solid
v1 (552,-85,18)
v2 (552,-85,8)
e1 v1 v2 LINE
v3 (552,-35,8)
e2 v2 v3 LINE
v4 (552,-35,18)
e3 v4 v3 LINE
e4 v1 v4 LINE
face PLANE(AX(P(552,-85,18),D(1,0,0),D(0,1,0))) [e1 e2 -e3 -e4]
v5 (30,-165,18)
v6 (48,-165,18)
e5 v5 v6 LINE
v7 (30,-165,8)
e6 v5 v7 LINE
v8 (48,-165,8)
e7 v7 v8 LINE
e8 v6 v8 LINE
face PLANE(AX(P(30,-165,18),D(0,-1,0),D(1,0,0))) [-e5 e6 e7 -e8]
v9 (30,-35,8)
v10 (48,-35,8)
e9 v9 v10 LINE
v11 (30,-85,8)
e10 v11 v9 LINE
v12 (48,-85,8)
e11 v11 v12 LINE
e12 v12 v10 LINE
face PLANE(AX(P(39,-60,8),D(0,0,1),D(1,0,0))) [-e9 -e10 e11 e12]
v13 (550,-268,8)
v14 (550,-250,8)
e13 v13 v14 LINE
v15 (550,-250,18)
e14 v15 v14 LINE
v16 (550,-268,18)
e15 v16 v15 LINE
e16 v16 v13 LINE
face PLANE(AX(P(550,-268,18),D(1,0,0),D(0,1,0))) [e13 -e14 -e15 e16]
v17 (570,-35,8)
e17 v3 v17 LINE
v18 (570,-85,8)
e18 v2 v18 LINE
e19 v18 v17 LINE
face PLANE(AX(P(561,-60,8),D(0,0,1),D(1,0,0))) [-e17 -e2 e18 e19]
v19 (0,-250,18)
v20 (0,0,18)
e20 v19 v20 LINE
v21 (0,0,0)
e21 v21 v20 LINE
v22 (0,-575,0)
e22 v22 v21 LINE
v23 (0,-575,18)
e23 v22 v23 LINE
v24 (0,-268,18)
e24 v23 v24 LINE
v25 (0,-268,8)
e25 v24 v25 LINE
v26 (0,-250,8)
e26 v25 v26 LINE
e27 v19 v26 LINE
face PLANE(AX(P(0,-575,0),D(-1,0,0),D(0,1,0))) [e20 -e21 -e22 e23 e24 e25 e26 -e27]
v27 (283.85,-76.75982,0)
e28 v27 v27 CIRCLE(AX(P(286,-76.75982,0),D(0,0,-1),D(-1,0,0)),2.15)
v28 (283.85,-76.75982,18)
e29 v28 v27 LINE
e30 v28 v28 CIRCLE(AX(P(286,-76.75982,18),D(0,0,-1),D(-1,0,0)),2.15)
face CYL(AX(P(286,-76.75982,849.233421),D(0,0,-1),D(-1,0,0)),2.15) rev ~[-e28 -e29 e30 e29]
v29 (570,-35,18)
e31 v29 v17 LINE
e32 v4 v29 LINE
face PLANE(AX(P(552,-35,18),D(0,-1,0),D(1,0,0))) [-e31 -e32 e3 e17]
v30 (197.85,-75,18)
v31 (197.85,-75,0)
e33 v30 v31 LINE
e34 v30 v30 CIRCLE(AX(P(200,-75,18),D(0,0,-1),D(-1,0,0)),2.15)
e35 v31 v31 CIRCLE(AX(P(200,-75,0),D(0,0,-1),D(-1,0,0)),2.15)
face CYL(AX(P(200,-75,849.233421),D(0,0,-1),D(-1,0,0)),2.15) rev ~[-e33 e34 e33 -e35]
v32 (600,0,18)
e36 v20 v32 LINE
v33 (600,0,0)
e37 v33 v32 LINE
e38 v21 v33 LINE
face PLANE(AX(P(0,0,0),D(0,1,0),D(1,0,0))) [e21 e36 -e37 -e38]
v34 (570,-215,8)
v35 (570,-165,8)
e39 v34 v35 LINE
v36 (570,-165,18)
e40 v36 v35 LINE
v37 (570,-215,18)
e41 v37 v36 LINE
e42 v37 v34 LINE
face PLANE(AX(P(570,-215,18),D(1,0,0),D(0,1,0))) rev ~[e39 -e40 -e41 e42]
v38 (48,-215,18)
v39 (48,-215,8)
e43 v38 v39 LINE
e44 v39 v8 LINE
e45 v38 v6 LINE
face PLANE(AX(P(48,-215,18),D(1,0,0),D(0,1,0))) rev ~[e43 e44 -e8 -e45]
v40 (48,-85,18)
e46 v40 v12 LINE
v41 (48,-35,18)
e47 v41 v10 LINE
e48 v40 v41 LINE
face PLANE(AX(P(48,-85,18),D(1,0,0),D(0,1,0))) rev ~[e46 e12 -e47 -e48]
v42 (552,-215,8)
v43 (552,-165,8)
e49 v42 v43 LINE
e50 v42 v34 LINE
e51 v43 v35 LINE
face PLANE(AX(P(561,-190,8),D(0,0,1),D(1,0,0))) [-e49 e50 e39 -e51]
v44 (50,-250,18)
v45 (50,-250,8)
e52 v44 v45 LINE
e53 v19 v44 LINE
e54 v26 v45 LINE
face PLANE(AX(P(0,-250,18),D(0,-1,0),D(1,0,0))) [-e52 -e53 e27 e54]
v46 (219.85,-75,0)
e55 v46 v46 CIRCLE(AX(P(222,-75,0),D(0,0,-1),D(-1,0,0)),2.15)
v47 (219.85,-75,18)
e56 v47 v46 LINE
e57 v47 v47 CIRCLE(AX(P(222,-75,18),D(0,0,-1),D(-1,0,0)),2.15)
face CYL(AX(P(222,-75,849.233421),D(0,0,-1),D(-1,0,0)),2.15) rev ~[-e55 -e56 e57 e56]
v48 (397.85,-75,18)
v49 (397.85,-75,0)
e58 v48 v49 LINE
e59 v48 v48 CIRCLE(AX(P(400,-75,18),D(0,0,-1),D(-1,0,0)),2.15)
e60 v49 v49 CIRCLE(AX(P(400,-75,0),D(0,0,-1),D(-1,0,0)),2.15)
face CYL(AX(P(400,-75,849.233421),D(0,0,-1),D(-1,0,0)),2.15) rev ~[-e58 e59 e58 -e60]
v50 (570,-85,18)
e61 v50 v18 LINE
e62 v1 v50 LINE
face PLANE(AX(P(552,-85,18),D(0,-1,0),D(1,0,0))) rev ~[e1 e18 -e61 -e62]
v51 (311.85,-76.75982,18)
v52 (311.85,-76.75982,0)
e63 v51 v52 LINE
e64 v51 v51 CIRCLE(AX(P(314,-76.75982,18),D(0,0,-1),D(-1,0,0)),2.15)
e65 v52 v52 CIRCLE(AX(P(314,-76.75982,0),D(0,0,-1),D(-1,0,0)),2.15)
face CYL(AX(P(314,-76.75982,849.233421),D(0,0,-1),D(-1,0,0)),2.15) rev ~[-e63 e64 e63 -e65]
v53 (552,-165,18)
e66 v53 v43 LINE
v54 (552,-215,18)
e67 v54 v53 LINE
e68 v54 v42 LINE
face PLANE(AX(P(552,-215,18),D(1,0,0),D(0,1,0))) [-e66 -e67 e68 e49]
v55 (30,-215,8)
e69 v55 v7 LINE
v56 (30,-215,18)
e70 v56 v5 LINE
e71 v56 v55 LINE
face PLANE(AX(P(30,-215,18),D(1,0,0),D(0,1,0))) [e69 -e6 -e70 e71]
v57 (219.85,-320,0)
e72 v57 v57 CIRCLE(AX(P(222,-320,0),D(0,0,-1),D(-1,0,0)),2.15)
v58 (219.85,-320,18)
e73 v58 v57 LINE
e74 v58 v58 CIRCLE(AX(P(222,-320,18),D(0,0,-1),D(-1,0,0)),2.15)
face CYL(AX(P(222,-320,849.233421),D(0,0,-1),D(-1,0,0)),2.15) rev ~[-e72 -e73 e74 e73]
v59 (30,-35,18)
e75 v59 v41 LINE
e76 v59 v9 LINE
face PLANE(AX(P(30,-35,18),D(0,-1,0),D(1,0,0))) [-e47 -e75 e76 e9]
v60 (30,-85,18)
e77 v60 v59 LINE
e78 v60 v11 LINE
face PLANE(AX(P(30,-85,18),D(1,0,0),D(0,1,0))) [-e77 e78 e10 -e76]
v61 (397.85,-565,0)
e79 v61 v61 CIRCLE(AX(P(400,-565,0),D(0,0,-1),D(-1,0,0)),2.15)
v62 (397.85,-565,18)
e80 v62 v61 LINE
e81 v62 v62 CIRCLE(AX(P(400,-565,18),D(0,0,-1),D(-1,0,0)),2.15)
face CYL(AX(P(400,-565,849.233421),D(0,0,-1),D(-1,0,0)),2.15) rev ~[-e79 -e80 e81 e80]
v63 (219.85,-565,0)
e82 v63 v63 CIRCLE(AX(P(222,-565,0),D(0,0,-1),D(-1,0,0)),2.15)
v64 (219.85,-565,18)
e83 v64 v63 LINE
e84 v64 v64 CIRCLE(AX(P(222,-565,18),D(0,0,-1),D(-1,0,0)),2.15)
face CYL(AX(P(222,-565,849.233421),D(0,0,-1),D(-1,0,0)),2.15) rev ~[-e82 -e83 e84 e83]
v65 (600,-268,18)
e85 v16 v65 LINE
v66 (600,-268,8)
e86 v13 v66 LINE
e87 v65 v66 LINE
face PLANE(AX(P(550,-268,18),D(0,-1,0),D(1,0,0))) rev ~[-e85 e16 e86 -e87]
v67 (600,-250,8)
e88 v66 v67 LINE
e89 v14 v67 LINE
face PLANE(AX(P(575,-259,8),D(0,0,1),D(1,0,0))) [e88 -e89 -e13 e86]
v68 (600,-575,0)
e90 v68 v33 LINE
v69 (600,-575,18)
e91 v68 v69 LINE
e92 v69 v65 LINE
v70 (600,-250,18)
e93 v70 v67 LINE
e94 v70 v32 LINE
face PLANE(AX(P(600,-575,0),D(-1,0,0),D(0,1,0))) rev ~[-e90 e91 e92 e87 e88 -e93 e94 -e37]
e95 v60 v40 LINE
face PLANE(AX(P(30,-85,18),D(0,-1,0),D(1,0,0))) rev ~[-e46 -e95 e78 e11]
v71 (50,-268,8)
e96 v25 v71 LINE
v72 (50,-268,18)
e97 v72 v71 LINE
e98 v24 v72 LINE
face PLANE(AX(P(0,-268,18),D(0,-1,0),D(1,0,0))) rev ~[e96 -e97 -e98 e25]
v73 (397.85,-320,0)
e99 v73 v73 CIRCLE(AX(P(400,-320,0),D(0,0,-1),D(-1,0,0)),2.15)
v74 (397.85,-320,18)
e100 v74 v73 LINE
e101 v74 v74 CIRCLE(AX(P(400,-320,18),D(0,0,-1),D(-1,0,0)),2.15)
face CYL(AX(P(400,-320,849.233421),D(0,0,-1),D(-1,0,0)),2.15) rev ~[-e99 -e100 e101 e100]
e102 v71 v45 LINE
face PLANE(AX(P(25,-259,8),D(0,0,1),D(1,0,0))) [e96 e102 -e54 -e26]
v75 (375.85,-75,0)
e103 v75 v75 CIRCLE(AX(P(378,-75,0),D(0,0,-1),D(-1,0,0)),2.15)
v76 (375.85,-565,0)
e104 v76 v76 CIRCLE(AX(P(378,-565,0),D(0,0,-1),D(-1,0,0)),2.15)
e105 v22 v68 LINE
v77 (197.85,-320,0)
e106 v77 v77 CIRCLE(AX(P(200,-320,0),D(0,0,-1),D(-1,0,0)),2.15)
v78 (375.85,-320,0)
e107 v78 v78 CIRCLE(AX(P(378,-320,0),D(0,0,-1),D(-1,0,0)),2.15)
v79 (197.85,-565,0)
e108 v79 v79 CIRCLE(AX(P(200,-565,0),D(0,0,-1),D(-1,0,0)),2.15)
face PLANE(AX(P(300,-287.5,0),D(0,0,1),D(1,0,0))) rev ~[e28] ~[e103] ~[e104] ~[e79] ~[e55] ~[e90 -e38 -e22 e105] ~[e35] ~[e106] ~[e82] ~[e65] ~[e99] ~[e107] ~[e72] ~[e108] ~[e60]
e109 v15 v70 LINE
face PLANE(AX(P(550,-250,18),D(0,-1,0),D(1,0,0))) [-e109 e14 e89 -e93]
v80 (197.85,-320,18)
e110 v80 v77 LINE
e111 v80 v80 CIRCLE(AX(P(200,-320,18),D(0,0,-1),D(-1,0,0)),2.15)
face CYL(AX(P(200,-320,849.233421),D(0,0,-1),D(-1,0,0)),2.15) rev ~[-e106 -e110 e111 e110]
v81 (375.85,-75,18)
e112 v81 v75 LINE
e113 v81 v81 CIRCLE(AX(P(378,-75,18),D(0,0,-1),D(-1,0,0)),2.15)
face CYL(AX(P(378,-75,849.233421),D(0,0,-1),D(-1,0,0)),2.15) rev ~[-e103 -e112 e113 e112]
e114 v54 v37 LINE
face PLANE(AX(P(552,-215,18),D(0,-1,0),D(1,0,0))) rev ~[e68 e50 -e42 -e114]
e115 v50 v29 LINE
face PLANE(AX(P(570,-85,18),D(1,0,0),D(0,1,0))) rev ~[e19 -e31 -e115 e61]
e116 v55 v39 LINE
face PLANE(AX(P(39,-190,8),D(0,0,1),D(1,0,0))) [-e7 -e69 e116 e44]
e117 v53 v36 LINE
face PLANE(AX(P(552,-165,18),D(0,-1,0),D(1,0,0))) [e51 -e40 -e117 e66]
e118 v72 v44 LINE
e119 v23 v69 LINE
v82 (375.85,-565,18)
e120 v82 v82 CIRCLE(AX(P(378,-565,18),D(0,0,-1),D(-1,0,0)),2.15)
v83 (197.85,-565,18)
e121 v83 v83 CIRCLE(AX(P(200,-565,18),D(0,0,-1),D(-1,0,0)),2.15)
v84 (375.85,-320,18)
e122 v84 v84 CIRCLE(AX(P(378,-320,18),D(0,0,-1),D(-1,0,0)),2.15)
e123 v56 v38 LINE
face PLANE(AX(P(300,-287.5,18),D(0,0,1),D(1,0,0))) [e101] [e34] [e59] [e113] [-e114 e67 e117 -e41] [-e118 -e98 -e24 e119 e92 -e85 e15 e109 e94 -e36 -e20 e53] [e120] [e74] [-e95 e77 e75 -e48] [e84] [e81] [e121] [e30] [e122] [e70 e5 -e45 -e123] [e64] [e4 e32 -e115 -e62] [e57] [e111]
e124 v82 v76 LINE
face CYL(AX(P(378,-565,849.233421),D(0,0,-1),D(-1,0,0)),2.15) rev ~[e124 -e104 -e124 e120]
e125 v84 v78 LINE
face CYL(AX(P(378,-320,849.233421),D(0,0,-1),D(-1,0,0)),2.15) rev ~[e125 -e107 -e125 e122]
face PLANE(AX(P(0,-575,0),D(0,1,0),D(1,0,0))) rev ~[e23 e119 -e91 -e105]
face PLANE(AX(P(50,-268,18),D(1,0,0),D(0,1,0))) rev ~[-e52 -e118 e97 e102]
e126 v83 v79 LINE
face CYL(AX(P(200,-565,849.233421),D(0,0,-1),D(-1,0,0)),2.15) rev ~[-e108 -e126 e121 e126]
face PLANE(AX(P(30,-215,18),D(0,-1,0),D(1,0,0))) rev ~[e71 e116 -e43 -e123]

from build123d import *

# Parameters (mm, degrees)
F0_W     = 600
F0_H     = 575
F1_DEPTH = 18
F2_W     = 18
F2_H     = 50
F2_W_2   = 50
F2_H_2   = 18
F3_DEPTH = 10
F5_D     = 4.3
F6_D     = 4.3


with BuildPart() as f1:
    # F0 (on Top) → F1 (new body)
    with BuildSketch(Plane.XY):
        with Locations((300, -287.5)):
            Rectangle(F0_W, F0_H)
    extrude(amount=F1_DEPTH)

    # F2 (on face) → F3 (cut)
    with BuildSketch(Plane.XY.offset(18)):
        with Locations((39, -60)):
            Rectangle(F2_W, F2_H)
        with Locations((561, -60)):
            Rectangle(F2_W, F2_H)
        with Locations((561, -190)):
            Rectangle(F2_W, F2_H)
        with Locations((575, -259)):
            Rectangle(F2_W_2, F2_H_2)
        with Locations((25, -259)):
            Rectangle(F2_W_2, F2_H_2)
        with Locations((39, -190)):
            Rectangle(F2_W, F2_H)
    extrude(amount=-F3_DEPTH, mode=Mode.SUBTRACT)

    # F5 (through all)
    with Locations(Plane.XY.offset(18)):
        with Locations((200, -75), (222, -75), (200, -320), (222, -320), (378, -75), (400, -75), (400, -320), (378, -320), (378, -565), (400, -565), (200, -565), (222, -565)):
            Hole(F5_D / 2)

    # F6 (through all)
    with Locations(Plane.XY.offset(18)):
        with Locations((286, -76.75982), (314, -76.75982)):
            Hole(F6_D / 2)


solid = f1.part
